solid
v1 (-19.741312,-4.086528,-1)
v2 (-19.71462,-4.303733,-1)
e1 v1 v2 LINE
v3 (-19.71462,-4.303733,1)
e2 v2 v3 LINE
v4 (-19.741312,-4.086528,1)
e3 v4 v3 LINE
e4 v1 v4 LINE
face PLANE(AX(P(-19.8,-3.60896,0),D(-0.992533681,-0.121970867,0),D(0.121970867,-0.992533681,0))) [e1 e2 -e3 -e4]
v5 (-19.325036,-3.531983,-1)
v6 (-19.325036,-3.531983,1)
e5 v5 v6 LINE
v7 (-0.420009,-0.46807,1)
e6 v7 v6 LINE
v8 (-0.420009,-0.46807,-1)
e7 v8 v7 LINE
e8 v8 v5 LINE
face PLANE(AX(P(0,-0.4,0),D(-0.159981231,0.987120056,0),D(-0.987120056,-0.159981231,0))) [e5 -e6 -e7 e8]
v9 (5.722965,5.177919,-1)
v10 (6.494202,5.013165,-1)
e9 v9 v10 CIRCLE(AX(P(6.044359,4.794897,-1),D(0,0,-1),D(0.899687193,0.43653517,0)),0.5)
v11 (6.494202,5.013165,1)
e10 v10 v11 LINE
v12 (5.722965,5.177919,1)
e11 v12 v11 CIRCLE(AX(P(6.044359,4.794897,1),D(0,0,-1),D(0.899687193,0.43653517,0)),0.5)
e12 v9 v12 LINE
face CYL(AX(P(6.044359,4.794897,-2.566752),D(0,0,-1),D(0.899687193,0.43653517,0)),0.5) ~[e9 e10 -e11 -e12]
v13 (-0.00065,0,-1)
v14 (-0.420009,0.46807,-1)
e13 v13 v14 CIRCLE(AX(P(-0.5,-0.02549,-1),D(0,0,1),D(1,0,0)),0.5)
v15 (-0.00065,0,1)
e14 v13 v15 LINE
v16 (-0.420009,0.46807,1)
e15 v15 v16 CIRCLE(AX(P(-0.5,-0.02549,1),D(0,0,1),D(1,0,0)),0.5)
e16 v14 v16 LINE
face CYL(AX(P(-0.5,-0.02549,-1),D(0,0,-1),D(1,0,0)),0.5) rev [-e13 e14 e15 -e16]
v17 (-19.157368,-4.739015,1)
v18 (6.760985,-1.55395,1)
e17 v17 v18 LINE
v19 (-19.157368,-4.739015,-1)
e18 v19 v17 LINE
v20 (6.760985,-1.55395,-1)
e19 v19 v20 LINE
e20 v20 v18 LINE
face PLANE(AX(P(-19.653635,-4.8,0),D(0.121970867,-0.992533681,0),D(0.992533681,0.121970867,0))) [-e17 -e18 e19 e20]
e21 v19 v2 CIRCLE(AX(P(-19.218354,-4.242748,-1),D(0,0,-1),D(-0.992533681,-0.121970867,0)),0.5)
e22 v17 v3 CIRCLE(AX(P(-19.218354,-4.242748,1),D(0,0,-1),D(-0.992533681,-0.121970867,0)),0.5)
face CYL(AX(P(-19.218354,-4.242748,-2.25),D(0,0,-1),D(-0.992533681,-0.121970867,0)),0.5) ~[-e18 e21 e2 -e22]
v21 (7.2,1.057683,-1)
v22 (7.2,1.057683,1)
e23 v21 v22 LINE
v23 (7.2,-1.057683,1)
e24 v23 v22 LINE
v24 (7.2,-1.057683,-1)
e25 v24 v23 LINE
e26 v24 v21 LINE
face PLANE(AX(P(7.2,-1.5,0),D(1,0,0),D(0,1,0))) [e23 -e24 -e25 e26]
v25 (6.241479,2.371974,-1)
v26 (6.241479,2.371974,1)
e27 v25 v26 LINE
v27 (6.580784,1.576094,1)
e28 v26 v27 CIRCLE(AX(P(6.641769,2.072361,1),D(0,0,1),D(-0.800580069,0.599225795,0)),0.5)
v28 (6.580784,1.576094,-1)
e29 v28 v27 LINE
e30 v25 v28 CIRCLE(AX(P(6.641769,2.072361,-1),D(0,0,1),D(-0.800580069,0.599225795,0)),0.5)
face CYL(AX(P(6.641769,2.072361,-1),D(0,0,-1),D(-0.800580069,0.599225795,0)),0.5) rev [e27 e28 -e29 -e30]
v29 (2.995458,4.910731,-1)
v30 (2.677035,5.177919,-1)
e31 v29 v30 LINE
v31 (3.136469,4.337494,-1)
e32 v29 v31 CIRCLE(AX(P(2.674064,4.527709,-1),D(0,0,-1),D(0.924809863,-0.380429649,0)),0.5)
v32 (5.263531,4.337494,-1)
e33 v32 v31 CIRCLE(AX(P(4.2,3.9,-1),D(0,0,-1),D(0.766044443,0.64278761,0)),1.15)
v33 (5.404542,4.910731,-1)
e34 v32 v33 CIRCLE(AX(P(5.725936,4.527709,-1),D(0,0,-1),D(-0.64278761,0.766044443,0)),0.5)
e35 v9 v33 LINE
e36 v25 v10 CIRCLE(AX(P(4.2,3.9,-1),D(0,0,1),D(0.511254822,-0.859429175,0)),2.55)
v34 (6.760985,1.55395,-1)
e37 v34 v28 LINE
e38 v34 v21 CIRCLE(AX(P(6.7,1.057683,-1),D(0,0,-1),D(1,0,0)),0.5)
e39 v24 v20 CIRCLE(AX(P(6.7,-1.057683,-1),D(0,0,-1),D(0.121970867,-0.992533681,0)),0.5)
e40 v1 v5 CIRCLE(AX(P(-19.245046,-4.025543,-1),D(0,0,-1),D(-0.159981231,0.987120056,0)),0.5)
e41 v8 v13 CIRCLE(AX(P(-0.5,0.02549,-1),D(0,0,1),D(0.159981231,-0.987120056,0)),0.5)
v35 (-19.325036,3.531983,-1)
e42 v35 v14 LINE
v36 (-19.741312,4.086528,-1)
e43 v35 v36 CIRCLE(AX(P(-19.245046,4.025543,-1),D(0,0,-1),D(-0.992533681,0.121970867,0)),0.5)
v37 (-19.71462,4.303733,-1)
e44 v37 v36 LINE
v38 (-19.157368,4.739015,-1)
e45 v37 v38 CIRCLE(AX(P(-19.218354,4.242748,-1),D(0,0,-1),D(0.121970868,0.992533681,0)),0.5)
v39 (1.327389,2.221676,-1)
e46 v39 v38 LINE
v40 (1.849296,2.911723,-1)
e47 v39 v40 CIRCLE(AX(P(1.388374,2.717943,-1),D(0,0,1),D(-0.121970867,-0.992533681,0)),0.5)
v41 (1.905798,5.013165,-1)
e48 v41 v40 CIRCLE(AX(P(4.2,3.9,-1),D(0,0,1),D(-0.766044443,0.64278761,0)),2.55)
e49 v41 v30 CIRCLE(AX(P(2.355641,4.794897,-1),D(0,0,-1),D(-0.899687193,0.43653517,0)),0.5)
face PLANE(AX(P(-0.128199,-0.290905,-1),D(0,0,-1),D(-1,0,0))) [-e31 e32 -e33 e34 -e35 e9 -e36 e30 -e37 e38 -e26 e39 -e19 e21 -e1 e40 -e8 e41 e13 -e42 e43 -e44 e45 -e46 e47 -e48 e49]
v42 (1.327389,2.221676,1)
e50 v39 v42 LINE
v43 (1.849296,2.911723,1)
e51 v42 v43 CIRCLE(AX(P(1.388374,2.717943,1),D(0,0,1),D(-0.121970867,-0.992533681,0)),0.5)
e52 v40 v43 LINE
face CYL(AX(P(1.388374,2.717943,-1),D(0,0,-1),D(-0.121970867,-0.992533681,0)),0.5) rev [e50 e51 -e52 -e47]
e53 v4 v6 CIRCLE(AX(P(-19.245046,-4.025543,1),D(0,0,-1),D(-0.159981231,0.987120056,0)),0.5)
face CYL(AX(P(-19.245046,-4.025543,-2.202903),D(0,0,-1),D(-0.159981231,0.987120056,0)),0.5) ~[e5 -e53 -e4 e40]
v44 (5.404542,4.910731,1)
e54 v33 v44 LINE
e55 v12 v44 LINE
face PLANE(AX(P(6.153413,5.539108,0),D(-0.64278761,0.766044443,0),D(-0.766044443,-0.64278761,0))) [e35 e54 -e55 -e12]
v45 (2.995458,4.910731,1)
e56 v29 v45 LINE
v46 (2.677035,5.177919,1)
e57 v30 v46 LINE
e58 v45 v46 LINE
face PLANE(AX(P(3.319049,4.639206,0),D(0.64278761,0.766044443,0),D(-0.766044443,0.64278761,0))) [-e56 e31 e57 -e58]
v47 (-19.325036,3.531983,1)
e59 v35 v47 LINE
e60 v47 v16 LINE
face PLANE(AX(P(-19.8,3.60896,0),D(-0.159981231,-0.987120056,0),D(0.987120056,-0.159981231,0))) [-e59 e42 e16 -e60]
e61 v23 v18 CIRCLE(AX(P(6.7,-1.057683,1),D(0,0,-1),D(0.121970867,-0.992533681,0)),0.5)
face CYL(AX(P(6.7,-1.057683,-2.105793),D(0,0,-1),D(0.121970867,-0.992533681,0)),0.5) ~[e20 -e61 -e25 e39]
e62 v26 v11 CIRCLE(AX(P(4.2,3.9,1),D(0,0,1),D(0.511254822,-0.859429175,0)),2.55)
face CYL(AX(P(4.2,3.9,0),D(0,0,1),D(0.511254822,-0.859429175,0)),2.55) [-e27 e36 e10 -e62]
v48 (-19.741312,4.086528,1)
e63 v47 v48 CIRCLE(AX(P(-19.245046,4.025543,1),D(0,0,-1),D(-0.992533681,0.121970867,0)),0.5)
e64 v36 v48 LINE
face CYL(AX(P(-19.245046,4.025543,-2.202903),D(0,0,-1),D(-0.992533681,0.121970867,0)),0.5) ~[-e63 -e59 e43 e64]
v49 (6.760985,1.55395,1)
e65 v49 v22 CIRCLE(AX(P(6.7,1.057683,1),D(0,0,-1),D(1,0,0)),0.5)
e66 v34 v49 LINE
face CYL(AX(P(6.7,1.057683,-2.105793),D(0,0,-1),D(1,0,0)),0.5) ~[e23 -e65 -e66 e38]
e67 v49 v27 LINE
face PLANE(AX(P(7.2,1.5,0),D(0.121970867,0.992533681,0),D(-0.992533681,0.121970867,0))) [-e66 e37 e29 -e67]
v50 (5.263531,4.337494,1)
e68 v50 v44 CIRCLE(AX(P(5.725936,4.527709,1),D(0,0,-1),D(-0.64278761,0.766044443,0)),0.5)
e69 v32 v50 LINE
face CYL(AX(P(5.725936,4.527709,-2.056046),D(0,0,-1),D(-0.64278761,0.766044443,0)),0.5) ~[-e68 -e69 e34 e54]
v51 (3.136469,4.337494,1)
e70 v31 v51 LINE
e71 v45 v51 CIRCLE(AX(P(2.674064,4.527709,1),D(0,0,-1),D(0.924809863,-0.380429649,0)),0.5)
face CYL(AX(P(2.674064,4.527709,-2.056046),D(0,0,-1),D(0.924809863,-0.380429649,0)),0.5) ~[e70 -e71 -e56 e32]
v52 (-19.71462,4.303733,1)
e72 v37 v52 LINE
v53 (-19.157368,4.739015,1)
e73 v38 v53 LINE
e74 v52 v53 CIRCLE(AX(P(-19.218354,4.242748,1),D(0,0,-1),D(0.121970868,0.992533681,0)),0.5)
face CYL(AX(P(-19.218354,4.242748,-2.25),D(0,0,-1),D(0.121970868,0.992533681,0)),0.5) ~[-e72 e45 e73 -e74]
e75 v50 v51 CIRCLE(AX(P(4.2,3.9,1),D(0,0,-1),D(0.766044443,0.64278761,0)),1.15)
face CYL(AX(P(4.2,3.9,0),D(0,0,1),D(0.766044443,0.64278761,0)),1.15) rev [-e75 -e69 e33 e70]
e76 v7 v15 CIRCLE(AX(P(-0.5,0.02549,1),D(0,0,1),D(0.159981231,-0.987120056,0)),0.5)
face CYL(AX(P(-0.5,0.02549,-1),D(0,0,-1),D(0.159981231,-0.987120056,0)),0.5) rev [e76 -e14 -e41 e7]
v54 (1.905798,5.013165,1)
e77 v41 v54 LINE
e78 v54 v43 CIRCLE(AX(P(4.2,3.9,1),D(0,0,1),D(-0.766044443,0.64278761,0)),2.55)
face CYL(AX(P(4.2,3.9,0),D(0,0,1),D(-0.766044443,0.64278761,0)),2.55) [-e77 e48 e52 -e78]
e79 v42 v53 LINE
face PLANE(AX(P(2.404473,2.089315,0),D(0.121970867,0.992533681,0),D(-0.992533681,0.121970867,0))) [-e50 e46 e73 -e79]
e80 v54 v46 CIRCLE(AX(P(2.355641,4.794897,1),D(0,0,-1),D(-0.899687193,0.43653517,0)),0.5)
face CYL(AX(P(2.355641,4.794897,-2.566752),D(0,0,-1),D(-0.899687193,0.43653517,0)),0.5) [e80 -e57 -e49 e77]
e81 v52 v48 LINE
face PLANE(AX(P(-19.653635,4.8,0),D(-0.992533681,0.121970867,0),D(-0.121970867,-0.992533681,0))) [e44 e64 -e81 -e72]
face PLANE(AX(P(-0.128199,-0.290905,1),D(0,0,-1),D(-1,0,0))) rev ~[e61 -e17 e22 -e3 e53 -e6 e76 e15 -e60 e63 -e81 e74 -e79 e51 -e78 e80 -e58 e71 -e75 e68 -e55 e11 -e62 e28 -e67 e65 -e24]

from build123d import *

# Parameters (mm, degrees)
F1_DEPTH     = 1
F2_T1_DEPTH  = 2
F2_T3_DEPTH  = 4.1120925968
F2_T5_DEPTH  = 5.1335042229
F2_T7_DEPTH  = 4.211585233
F2_T9_DEPTH  = 4.4058060179
F2_T11_DEPTH = 4.5


# Not quite as in the source:
# - a fillet or chamfer that OpenCascade refuses, or shapes differently, is made with other operations: its cross-section is extruded or revolved along the edge and cut away or added


with BuildPart() as f1:
    # F0 (on Top) → F1 (new body, symmetric)
    with BuildSketch(Plane.XY):
        with BuildLine():
            Line((-19.8, -3.608959583), (-19.6536349592, -4.8))
            Line((-19.6536349592, -4.8), (7.2, -1.5))
            Line((7.2, -1.5), (7.2, 1.5))
            Line((7.2, 1.5), (5.5036997956, 1.7084556032))
            ThreePointArc((5.5036997956, 1.7084556032), (6.7140946083, 3.4735867022), (6.15341333, 5.5391084047))
            Line((6.15341333, 5.5391084047), (5.0809511096, 4.6392057511))
            ThreePointArc((5.0809511096, 4.6392057511), (4.2, 2.75), (3.3190488904, 4.6392057511))
            Line((3.3190488904, 4.6392057511), (2.24658667, 5.5391084047))
            ThreePointArc((2.24658667, 5.5391084047), (1.6526664248, 3.7834167399), (2.4044726286, 2.089314644))
            Line((2.4044726286, 2.089314644), (-19.6536349592, 4.8))
            Line((-19.6536349592, 4.8), (-19.8, 3.608959583))
            Line((-19.8, 3.608959583), (0, 0.4))
            Line((0, 0.4), (0, -0.4))
            Line((0, -0.4), (-19.8, -3.608959583))
        make_face()
    extrude(amount=F1_DEPTH, both=True)

    # F2: fillet of radius 0.5 on 14 edges, made by hand

    # F2_s2 → F2_t1 (join)
    with BuildSketch(Plane.XY.offset(-1)):
        with BuildLine():
            ThreePointArc((-0.4200093847, -0.4680703606), (-0.1192144254, -0.2985509875), (0, 0.0254896676))
            Line((0, 0.0254896676), (0, -0.4))
            Line((0, -0.4), (-0.4200093847, -0.4680703606))
        make_face()
        with BuildLine():
            ThreePointArc((0, -0.0254896676), (-0.1192144254, 0.2985509875), (-0.4200093847, 0.4680703606))
            Line((-0.4200093847, 0.4680703606), (0, 0.4))
            Line((0, 0.4), (0, -0.0254896676))
        make_face()
        with BuildLine():
            ThreePointArc((6.2414791759, 2.3719742233), (6.1818236662, 1.8762743647), (6.5807837768, 1.5760944855))
            Line((6.5807837768, 1.5760944855), (5.5036997956, 1.7084556032))
            ThreePointArc((5.5036997956, 1.7084556032), (5.9051744273, 2.003983077), (6.2414791759, 2.3719742233))
        make_face()
        with BuildLine():
            ThreePointArc((1.3273886474, 2.2216757617), (1.7871578534, 2.4163277766), (1.8492963629, 2.9117225034))
            ThreePointArc((1.8492963629, 2.9117225034), (2.0864966132, 2.4732542504), (2.4044726286, 2.089314644))
            Line((2.4044726286, 2.089314644), (1.3273886474, 2.2216757617))
        make_face()
    extrude(amount=F2_T1_DEPTH)

    # F2_s4 → F2_t3 (cut)
    with BuildSketch(Plane.XY.offset(-2.0560462984)):
        with BuildLine():
            ThreePointArc((3.1364686576, 4.3374940957), (3.1595895158, 4.6471438712), (2.995457531, 4.9107311415))
            Line((2.995457531, 4.9107311415), (3.3190488904, 4.6392057511))
            ThreePointArc((3.3190488904, 4.6392057511), (3.2161247629, 4.4953902231), (3.1364686576, 4.3374940957))
        make_face()
        with BuildLine():
            ThreePointArc((5.404542469, 4.9107311415), (5.2404104842, 4.6471438712), (5.2635313424, 4.3374940957))
            ThreePointArc((5.2635313424, 4.3374940957), (5.1838752371, 4.4953902231), (5.0809511096, 4.6392057511))
            Line((5.0809511096, 4.6392057511), (5.404542469, 4.9107311415))
        make_face()
    extrude(amount=F2_T3_DEPTH, mode=Mode.SUBTRACT)

    # F2_s6 → F2_t5 (cut)
    with BuildSketch(Plane.XY.offset(-2.5667521115)):
        with BuildLine():
            ThreePointArc((1.9057976578, 5.0131646836), (2.2511861931, 5.283864521), (2.6770350591, 5.1779193202))
            Line((2.6770350591, 5.1779193202), (2.24658667, 5.5391084047))
            ThreePointArc((2.24658667, 5.5391084047), (2.0599733824, 5.2866456202), (1.9057976578, 5.0131646836))
        make_face()
        with BuildLine():
            ThreePointArc((6.4942023422, 5.0131646836), (6.1488138069, 5.283864521), (5.7229649409, 5.1779193202))
            Line((5.7229649409, 5.1779193202), (6.15341333, 5.5391084047))
            ThreePointArc((6.15341333, 5.5391084047), (6.3400266176, 5.2866456202), (6.4942023422, 5.0131646836))
        make_face()
    extrude(amount=F2_T5_DEPTH, mode=Mode.SUBTRACT)

    # F2_s8 → F2_t7 (cut)
    with BuildSketch(Plane.XY.offset(-2.1057926165)):
        with BuildLine():
            ThreePointArc((7.2, 1.0576829534), (7.0744948043, 1.388973825), (6.7609854337, 1.5539497938))
            Line((6.7609854337, 1.5539497938), (7.2, 1.5))
            Line((7.2, 1.5), (7.2, 1.0576829534))
        make_face()
        with BuildLine():
            ThreePointArc((6.7609854337, -1.5539497938), (7.0744948043, -1.388973825), (7.2, -1.0576829534))
            Line((7.2, -1.0576829534), (7.2, -1.5))
            Line((7.2, -1.5), (6.7609854337, -1.5539497938))
        make_face()
    extrude(amount=F2_T7_DEPTH, mode=Mode.SUBTRACT)

    # F2_s10 → F2_t9 (cut)
    with BuildSketch(Plane.XY.offset(-2.202903009)):
        with BuildLine():
            ThreePointArc((-19.3250361256, -3.5319828216), (-19.644918404, -3.7253734495), (-19.7413123507, -4.0865282835))
            Line((-19.7413123507, -4.0865282835), (-19.8, -3.608959583))
            Line((-19.8, -3.608959583), (-19.3250361256, -3.5319828216))
        make_face()
        with BuildLine():
            ThreePointArc((-19.7413123507, 4.0865282835), (-19.644918404, 3.7253734495), (-19.3250361256, 3.5319828216))
            Line((-19.3250361256, 3.5319828216), (-19.8, 3.608959583))
            Line((-19.8, 3.608959583), (-19.7413123507, 4.0865282835))
        make_face()
    extrude(amount=F2_T9_DEPTH, mode=Mode.SUBTRACT)

    # F2_s12 → F2_t11 (cut)
    with BuildSketch(Plane.XY.offset(-2.25)):
        with BuildLine():
            ThreePointArc((-19.7146203929, -4.3037331596), (-19.5261439869, -4.6367845878), (-19.1573681188, -4.7390145663))
            Line((-19.1573681188, -4.7390145663), (-19.6536349592, -4.8))
            Line((-19.6536349592, -4.8), (-19.7146203929, -4.3037331596))
        make_face()
        with BuildLine():
            ThreePointArc((-19.1573681188, 4.7390145663), (-19.5261439869, 4.6367845878), (-19.7146203929, 4.3037331596))
            Line((-19.7146203929, 4.3037331596), (-19.6536349592, 4.8))
            Line((-19.6536349592, 4.8), (-19.1573681188, 4.7390145663))
        make_face()
    extrude(amount=F2_T11_DEPTH, mode=Mode.SUBTRACT)


solid = f1.part
